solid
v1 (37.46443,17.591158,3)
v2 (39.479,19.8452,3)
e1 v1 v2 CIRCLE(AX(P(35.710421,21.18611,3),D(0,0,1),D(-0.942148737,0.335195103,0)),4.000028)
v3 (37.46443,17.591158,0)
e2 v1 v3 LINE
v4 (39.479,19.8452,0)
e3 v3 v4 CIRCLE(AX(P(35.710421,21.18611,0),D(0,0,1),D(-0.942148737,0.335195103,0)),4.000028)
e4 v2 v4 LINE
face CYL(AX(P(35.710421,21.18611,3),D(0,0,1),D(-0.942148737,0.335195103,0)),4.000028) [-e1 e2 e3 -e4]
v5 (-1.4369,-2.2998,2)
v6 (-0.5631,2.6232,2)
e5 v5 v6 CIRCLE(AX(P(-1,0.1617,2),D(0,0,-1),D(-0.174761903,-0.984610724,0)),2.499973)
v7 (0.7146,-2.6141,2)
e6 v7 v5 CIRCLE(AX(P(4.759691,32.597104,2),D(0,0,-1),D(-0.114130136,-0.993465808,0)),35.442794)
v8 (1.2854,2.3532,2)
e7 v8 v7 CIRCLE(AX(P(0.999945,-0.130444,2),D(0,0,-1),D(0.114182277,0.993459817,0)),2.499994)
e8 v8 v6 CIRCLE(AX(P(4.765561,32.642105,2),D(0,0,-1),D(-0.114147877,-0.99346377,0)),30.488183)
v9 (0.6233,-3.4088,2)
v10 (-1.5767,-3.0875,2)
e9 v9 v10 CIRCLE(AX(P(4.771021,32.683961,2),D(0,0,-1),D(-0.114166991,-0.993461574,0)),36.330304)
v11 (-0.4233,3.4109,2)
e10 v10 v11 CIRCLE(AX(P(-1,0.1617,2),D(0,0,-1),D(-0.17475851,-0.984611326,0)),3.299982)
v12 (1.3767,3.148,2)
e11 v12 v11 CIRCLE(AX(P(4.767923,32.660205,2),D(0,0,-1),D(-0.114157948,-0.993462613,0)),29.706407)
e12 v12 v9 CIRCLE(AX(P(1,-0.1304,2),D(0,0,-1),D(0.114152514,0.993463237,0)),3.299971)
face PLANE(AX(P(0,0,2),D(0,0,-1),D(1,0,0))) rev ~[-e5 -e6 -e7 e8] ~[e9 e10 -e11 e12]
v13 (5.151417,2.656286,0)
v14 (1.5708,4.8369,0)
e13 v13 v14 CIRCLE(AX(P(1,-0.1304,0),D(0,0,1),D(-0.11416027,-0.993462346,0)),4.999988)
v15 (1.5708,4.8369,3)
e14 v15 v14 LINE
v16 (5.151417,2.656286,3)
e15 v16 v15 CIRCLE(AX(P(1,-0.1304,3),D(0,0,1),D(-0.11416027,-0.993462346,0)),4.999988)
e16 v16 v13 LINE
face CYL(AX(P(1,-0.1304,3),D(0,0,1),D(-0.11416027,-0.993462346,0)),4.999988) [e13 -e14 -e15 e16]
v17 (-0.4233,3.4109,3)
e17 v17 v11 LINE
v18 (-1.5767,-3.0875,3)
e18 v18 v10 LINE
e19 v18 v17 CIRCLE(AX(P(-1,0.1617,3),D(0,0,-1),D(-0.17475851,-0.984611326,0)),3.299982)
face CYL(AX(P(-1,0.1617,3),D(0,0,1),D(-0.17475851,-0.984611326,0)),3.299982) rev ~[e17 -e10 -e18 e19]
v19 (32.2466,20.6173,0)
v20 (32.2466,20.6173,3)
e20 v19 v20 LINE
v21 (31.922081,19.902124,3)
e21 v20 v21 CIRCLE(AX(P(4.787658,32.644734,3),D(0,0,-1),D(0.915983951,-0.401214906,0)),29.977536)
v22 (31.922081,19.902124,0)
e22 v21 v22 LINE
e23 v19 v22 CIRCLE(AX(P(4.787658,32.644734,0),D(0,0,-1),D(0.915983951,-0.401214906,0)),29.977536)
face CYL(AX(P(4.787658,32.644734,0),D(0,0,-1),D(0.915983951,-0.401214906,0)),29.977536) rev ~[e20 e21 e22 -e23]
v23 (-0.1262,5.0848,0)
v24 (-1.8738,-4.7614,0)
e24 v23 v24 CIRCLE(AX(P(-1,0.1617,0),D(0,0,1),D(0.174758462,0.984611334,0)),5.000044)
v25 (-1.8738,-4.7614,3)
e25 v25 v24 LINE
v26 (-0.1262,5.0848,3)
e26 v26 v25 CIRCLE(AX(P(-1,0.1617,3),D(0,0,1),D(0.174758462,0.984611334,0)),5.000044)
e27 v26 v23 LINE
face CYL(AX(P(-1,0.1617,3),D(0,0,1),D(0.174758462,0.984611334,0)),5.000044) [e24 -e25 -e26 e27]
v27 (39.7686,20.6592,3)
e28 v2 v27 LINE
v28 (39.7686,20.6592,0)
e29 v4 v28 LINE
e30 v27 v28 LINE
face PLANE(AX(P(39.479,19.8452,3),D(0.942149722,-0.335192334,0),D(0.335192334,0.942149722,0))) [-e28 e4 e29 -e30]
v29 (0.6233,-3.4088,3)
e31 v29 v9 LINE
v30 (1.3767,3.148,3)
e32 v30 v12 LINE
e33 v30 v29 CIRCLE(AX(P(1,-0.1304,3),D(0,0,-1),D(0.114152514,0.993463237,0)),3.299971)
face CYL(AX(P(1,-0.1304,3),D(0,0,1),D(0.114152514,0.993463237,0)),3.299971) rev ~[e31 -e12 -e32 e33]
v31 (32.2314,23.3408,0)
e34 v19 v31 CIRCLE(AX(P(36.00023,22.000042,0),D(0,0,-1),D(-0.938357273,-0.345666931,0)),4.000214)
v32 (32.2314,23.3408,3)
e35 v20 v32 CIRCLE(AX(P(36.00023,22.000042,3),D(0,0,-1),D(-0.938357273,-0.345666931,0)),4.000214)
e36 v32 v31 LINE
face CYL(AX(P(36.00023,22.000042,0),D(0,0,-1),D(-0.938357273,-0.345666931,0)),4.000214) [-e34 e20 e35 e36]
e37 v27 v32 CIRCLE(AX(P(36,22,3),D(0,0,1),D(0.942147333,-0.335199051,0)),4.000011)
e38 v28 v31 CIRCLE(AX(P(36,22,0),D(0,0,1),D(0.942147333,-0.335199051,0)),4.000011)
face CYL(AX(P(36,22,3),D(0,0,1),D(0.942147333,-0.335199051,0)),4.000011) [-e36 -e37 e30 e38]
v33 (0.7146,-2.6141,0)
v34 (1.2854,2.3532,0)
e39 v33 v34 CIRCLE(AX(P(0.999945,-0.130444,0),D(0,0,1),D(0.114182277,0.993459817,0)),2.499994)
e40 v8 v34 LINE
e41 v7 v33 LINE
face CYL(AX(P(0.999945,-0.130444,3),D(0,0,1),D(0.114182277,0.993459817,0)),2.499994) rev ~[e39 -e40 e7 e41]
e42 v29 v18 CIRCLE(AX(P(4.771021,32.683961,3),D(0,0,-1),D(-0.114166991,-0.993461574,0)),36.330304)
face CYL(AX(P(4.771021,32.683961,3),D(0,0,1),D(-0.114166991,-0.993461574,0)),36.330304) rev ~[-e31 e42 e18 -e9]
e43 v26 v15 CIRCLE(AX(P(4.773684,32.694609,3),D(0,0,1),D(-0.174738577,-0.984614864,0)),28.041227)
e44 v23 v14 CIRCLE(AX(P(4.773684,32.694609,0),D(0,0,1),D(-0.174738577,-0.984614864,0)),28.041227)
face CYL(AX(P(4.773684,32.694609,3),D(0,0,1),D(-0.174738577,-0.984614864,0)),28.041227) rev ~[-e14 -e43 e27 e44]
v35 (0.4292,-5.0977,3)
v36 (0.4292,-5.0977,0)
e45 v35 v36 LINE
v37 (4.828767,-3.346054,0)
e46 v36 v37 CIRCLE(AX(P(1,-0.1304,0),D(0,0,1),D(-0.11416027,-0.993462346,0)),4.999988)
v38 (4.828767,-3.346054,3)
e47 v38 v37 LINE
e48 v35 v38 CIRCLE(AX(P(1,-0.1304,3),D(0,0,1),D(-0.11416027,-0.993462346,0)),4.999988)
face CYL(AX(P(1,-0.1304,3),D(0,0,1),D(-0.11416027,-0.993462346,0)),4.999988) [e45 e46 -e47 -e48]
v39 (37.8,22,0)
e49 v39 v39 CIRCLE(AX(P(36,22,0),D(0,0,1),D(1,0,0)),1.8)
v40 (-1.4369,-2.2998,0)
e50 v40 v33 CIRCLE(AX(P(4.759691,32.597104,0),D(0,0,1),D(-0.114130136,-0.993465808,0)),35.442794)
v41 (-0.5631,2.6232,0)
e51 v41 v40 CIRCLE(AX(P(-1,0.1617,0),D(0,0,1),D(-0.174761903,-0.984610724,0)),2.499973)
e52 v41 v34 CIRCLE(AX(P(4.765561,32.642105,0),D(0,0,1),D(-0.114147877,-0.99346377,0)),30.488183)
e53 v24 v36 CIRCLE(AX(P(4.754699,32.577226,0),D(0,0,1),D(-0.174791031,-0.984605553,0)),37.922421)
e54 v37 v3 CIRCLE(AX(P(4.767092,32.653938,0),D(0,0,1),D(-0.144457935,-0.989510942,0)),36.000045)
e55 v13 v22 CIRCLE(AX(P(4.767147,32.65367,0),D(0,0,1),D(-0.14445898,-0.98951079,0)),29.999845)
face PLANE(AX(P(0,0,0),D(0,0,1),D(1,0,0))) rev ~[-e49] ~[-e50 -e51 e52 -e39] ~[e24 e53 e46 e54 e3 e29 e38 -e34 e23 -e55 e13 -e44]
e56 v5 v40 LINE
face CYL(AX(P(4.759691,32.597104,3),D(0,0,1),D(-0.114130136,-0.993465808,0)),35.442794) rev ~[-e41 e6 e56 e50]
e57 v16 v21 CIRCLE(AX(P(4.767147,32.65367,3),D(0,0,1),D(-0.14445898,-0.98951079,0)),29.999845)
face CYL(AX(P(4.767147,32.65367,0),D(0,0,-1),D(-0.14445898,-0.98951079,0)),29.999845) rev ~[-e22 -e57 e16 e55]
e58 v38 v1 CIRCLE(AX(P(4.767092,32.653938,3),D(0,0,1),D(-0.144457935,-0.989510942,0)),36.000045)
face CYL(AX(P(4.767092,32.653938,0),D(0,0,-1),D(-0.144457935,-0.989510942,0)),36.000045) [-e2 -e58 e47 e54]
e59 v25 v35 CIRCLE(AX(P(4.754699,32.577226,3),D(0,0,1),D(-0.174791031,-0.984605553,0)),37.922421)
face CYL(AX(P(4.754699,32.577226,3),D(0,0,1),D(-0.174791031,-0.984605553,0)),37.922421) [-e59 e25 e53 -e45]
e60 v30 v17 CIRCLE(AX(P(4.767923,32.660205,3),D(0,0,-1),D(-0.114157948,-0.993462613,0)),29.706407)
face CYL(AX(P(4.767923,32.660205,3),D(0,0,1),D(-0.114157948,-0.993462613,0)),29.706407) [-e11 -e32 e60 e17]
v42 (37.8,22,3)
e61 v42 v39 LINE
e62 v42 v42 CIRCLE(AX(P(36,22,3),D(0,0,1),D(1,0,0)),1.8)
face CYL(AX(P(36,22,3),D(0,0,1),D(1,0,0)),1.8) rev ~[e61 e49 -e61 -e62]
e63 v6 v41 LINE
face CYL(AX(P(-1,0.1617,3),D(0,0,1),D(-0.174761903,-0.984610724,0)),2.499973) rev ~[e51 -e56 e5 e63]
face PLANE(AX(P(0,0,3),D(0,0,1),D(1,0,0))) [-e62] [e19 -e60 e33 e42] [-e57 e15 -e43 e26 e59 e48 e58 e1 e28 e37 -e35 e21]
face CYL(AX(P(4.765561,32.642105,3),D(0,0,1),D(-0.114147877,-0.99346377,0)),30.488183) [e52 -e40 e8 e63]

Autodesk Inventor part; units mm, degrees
ref_plane "YZ Plane" through (0, 0, 0) normal (1, 0, 0) x (0, 1, 0)
ref_plane "XZ Plane" through (0, 0, 0) normal (0, 1, 0) x (-1, 0, 0)
ref_plane "XY Plane" through (0, 0, 0) normal (0, 0, 1) x (1, 0, 0)
sketch "Sketch1" plane through (0, 0, 0) normal (0, 0, 1) x (1, 0, 0)
  circle A0 centre (36, 22) radius 1.25
  circle A1 centre (36, 22) radius 3
  arc A2 (0, 0) -> (36, 22) centre (4.7671, 32.6539) ccw construction
  arc A3 (-0.4334, -2.9685) -> (38.8394, 21.0315) centre (4.7671, 32.6539) ccw
  arc A4 (0.4334, 2.9685) -> (33.1606, 22.9685) centre (4.7671, 32.6539) ccw
  arc A5 (0.4334, 2.9685) -> (-0.4334, -2.9685) centre (0, 0) ccw
  arc A6 (38.8394, 21.0315) -> (33.1606, 22.9685) centre (36, 22) ccw
  point P0 (41.5332, 21.1583)
  point P1 (35.8668, 23.1312)
  point P2 (38.8394, 21.0315)
  point P3 (33.1606, 22.9685)
  dimension "d1" = 30
  dimension "d21" = 6
  dimension "d22" = 2.5
  dimension "d23" = 36
  dimension "d24" = 22
extrude "Extrusion1" add sketch "Sketch1" along normal blind 3
sketch "Sketch3" plane through (0, 0, 3) normal (0, 0, 1) x (1, 0, 0)
  arc A0 (-1, 0.1617) -> (1, -0.1304) centre (4.7671, 32.6539) ccw construction
  arc A1 (-1.8738, -4.7614) -> (0.4292, -5.0977) centre (4.7671, 32.6539) ccw
  arc A2 (-0.1262, 5.0848) -> (1.5708, 4.8369) centre (4.7671, 32.6539) ccw
  arc A3 (-0.1262, 5.0848) -> (-1.8738, -4.7614) centre (-1, 0.1617) ccw
  arc A4 (0.4292, -5.0977) -> (1.5708, 4.8369) centre (1, -0.1304) ccw
  arc A5 (-0.4334, -2.9685) -> (38.8394, 21.0315) centre (4.7671, 32.6539) ccw projected
  point P0 (0, 0)
  dimension "d31" = 10
  dimension "d32" = 1
  dimension "d33" = 1
extrude "Extrusion3" add sketch "Sketch3" against normal blind 3
sketch "Sketch4" plane through (0, 0, 3) normal (0, 0, -1) x (1, 0, 0)
  arc A0 (-1.8738, 4.7614) -> (-0.1262, -5.0848) centre (-1, -0.1617) ccw projected
  arc A1 (0.4292, 5.0977) -> (-1.8738, 4.7614) centre (4.7671, -32.6539) ccw projected
  arc A2 (1.5708, -4.8369) -> (-0.1262, -5.0848) centre (4.7671, -32.6539) ccw projected
  arc A3 (1, 0.1304) -> (-1, -0.1617) centre (4.7671, -32.6539) ccw construction
  arc A4 (0.7146, 2.6141) -> (-1.4369, 2.2998) centre (4.7671, -32.6539) ccw
  arc A5 (1.2854, -2.3532) -> (-0.5631, -2.6232) centre (4.7671, -32.6539) ccw
  arc A6 (1.2854, -2.3532) -> (0.7146, 2.6141) centre (1, 0.1304) ccw
  arc A7 (-1.4369, 2.2998) -> (-0.5631, -2.6232) centre (-1, -0.1617) ccw
  arc A8 (33.1606, -22.9685) -> (5.1514, -2.6563) centre (4.7671, -32.6539) ccw projected
  arc A9 (33.1606, -22.9685) -> (38.8394, -21.0315) centre (36, -22) ccw projected
  arc A10 (38.8394, -21.0315) -> (4.8288, 3.3461) centre (4.7671, -32.6539) ccw projected
  arc A11 (4.8288, 3.3461) -> (0.4292, 5.0977) centre (1, 0.1304) ccw projected
  arc A12 (1.5708, -4.8369) -> (5.1514, -2.6563) centre (1, 0.1304) ccw projected
  arc A13 (1.3767, -3.148) -> (-0.4233, -3.4109) centre (4.7671, -32.6539) ccw
  arc A14 (1.3767, -3.148) -> (0.6233, 3.4088) centre (1, 0.1304) ccw
  arc A15 (0.6233, 3.4088) -> (-1.5767, 3.0875) centre (4.7671, -32.6539) ccw
  arc A16 (-1.5767, 3.0875) -> (-0.4233, -3.4109) centre (-1, -0.1617) ccw
  point P0 (0, 0)
  dimension "d43" = 5
  dimension "d52" = 0.8
extrude "Extrusion4" cut sketch "Sketch4" along normal through all contours A6 A5 A7 A4
sketch "Sketch5" plane through (0, 0, 3) normal (0, 0, 1) x (1, 0, 0)
  circle A0 centre (36, 22) radius 1.25 projected
  arc A1 (0, 0) -> (36, 22) centre (4.7671, 32.6539) ccw construction
  arc A2 (39.7686, 20.6592) -> (32.2314, 23.3408) centre (36, 22) ccw
  arc A3 (31.9418, 22.5269) -> (39.479, 19.8452) centre (35.7104, 21.1861) ccw
  line L0 (35.0504, 21.4307) -> (36.2779, 20.9758)
  line L1 (37.5646, 21.4663) -> (34.5144, 22.5068)
  line L2 (31.9418, 22.5269) -> (32.2314, 23.3408)
  line L3 (39.479, 19.8452) -> (39.7686, 20.6592)
  circle A4 centre (36, 22) radius 1.8
  dimension "d44" = 8
  dimension "d46" = 1.5
  dimension "d47" = 3.6
extrude "Extrusion5" cut sketch "Sketch5" against normal up to surface (3 mm away) contours A4
extrude "Extrusion6" add sketch "Sketch5" against normal up to surface (3 mm away) contours L3 A3 L2 A2
extrude "Extrusion7" cut sketch "Sketch4" along normal blind 1 contours A13 A16 A15 A14
sketch "Sketch6" plane through (0, 0, 0) normal (0, 0, -1) x (-1, 0, 0)
  circle A0 centre (-36, 22) radius 1.8 projected
  arc A1 (-37.4644, 17.5911) -> (-4.8288, -3.3461) centre (-4.7671, 32.6539) ccw projected
  arc A2 (-4.8288, -3.3461) -> (-0.4292, -5.0977) centre (-1, -0.1304) ccw projected
  arc A3 (-0.4292, -5.0977) -> (1.8738, -4.7614) centre (-4.7671, 32.6539) ccw projected
  arc A4 (1.8738, -4.7614) -> (0.1262, 5.0848) centre (1, 0.1617) ccw projected
  arc A5 (-1.5708, 4.8369) -> (0.1262, 5.0848) centre (-4.7671, 32.6539) ccw projected
  arc A6 (-1.5708, 4.8369) -> (-5.1514, 2.6563) centre (-1, -0.1304) ccw projected
  arc A7 (-31.9221, 19.9021) -> (-5.1514, 2.6563) centre (-4.7671, 32.6539) ccw projected
  arc A8 (-31.9221, 19.9021) -> (-31.9418, 22.5269) centre (-35.7104, 21.1861) ccw projected
  line L0 (-31.9418, 22.5269) -> (-32.2314, 23.3408) projected
  arc A9 (-32.2314, 23.3408) -> (-39.7686, 20.6592) centre (-36, 22) ccw projected
  line L1 (-39.7686, 20.6592) -> (-39.479, 19.8452) projected
  arc A10 (-39.479, 19.8452) -> (-37.4644, 17.5911) centre (-35.7104, 21.1861) ccw projected
  arc A11 (-0.7146, -2.6141) -> (1.4369, -2.2998) centre (-4.7671, 32.6539) ccw projected
  arc A12 (-1.2854, 2.3532) -> (-0.7146, -2.6141) centre (-1, -0.1304) ccw projected
  arc A13 (-1.2854, 2.3532) -> (0.5631, 2.6232) centre (-4.7671, 32.6539) ccw projected
  arc A14 (1.4369, -2.2998) -> (0.5631, 2.6232) centre (1, 0.1617) ccw projected
  arc A15 (-32.2314, 23.3408) -> (-39.7686, 20.6592) centre (-36, 22) ccw projected
  arc A16 (-32.2466, 20.6173) -> (-32.2314, 23.3408) centre (-36, 22) ccw
  arc A17 (-31.9221, 19.9021) -> (-5.1514, 2.6563) centre (-4.7671, 32.6539) ccw projected
  arc A18 (-32.2466, 20.6173) -> (-31.9221, 19.9021) centre (-4.7671, 32.6539) ccw
  arc A19 (-31.9221, 19.9021) -> (-5.1514, 2.6563) centre (-4.7671, 32.6539) ccw projected
  point P0 (0, 0)
extrude "Extrusion8" cut sketch "Sketch6" against normal up to surface (3 mm away) contours L0 A8 A18 A16
